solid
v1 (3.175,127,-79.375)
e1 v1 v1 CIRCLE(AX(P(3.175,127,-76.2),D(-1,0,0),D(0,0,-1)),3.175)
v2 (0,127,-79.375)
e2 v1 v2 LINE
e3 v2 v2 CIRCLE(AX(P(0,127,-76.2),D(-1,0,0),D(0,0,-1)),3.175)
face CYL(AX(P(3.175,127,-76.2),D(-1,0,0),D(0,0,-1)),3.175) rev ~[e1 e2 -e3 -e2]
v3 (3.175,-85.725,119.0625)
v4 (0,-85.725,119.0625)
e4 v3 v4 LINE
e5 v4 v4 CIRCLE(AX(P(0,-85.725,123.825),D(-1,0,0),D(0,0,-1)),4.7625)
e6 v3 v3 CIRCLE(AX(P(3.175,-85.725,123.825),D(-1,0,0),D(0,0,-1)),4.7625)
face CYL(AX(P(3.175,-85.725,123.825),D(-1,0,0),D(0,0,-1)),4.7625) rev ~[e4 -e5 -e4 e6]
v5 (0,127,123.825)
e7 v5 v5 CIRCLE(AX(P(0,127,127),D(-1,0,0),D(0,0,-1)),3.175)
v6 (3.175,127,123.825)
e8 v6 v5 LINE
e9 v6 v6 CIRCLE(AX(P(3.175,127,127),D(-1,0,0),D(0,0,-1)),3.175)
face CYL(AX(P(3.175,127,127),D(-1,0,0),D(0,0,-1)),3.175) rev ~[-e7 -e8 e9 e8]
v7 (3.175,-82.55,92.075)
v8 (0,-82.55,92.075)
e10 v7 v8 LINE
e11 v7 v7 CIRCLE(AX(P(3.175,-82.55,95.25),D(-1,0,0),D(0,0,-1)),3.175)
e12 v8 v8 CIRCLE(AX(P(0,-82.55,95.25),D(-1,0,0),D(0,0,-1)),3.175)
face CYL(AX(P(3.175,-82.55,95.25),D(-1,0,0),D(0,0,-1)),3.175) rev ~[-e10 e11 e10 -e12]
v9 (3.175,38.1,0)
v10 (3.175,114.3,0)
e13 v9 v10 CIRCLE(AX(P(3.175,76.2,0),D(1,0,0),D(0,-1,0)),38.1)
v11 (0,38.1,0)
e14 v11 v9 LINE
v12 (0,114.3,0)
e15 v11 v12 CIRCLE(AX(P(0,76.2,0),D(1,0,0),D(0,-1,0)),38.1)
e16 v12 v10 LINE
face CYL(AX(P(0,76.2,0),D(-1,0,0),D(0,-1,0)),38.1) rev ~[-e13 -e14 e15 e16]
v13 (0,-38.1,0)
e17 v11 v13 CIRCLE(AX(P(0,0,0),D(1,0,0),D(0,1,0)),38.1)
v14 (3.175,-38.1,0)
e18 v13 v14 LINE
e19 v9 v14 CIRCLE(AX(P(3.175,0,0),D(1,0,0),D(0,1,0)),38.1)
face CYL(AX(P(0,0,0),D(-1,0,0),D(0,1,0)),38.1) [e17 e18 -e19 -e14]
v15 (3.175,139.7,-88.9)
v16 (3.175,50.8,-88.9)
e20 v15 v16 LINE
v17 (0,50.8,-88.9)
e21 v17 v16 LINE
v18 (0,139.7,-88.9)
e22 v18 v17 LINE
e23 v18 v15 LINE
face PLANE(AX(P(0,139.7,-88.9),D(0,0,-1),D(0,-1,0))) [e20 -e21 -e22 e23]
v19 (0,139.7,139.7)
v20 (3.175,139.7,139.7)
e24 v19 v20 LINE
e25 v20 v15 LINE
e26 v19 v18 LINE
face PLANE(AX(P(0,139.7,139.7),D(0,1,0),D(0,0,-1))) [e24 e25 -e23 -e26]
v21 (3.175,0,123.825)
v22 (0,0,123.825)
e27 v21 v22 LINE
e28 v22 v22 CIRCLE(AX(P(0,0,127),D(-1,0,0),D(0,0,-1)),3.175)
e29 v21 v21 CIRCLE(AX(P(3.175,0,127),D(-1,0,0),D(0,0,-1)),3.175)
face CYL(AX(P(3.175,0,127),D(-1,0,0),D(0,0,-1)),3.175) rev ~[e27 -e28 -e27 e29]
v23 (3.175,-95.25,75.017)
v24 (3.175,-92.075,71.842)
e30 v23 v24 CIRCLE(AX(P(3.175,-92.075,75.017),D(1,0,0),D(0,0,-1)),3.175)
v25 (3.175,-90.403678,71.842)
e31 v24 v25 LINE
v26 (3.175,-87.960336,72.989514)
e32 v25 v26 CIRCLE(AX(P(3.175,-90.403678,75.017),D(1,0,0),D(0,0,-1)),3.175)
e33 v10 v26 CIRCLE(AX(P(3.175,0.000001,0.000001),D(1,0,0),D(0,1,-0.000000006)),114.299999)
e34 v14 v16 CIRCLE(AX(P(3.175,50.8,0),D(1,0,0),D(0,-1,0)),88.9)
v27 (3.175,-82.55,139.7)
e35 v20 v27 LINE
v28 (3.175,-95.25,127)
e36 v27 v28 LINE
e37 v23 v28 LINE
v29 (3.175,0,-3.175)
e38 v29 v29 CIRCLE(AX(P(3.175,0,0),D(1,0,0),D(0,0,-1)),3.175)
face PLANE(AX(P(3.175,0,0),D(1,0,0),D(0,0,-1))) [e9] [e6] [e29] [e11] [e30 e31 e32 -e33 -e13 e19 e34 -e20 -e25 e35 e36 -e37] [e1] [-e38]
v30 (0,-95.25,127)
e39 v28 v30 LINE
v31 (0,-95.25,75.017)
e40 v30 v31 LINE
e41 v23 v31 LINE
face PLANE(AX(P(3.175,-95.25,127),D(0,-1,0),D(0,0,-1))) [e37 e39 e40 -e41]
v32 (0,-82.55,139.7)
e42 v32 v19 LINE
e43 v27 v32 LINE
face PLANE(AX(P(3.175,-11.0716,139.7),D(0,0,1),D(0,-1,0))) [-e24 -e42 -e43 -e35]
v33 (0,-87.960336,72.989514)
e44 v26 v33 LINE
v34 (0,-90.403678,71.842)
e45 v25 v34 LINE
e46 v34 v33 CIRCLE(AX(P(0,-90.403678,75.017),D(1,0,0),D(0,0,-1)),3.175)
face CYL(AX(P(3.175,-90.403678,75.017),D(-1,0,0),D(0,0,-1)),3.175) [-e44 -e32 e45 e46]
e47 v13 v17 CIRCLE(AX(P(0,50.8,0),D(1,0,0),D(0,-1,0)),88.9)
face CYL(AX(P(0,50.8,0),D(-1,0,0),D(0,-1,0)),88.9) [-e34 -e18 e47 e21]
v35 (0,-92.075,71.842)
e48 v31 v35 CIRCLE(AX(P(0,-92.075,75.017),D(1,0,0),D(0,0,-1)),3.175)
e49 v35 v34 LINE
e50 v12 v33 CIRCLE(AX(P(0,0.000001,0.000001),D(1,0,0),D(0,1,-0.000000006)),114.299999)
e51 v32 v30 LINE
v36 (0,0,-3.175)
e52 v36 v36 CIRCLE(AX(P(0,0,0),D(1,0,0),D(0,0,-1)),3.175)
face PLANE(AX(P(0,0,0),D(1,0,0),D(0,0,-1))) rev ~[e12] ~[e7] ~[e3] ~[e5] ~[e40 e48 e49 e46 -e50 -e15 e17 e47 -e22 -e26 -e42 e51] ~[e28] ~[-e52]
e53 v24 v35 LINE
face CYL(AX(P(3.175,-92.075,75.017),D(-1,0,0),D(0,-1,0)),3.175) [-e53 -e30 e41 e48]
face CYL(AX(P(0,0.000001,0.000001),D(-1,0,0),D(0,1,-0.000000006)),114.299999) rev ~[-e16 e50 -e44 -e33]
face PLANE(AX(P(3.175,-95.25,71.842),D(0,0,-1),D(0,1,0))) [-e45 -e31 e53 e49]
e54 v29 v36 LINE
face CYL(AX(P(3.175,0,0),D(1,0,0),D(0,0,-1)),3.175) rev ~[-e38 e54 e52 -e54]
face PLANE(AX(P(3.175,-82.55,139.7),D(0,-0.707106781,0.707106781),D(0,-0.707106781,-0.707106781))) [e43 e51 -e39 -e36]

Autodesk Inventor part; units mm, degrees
ref_plane "YZ Plane" through (0, 0, 0) normal (1, 0, 0) x (0, 1, 0)
ref_plane "XZ Plane" through (0, 0, 0) normal (0, 1, 0) x (-1, 0, 0)
ref_plane "XY Plane" through (0, 0, 0) normal (0, 0, 1) x (1, 0, 0)
sketch "Sketch1" plane through (0, 0, 0) normal (1, 0, 0) x (0, 1, 0)
  circle A0 centre (0, 0) radius 50.8 construction
  circle A1 centre (82.55, 0) radius 31.75 construction
  circle A2 centre (-82.55, 0) radius 31.75 construction
  circle A3 centre (0, 0) radius 114.3 construction
  circle A4 centre (0, 0) radius 38.1 construction
  arc A5 (38.1, 0) -> (114.3, 0) centre (76.2, 0) ccw construction
  arc A6 (-38.1, 0) -> (139.7, 0) centre (50.8, 0) ccw construction
  line L0 (50.8, -88.9) -> (139.7, -88.9) construction
  line L1 (139.7, -88.9) -> (139.7, 0) construction
  line L2 (139.7, 0) -> (-101.6, 0) construction
  line L3 (-101.6, 0) -> (-101.6, 139.7) construction
  line L4 (-101.6, 139.7) -> (139.7, 139.7) construction
  line L5 (139.7, 139.7) -> (139.7, 0) construction
  arc A7 (11.0716, 139.7) -> (-101.6, 96.52) centre (0, 0) ccw construction
  line L6 (-101.6, 139.7) -> (-101.6, 63.1817) construction
  line L7 (-101.6, 63.1817) -> (-95.25, 63.1817) construction
  arc A8 (-11.0716, 139.7) -> (-101.6, 96.52) centre (0, 0) ccw
  line L8 (-11.0716, 139.7) -> (139.7, 139.7)
  line L9 (139.7, 139.7) -> (139.7, -88.9)
  line L10 (139.7, -88.9) -> (50.8, -88.9)
  arc A9 (-38.1, 0) -> (50.8, -88.9) centre (50.8, 0) ccw
  arc A10 (38.1, 0) -> (-38.1, 0) centre (0, 0) ccw
  arc A11 (38.1, 0) -> (114.3, 0) centre (76.2, 0) ccw
  arc A12 (114.3, 0) -> (-95.25, 63.1817) centre (0, 0) ccw
  line L11 (-95.25, 63.1817) -> (-101.6, 63.1817)
  line L12 (-101.6, 96.52) -> (-101.6, 63.1817)
  dimension "d1" = 63.5
  dimension "d0" = 101.6
  dimension "d2" = 63.5
  dimension "d3" = 82.55
  dimension "d4" = 82.55
  dimension "d5" = 0
  dimension "d6" = 0
  dimension "d7" = 228.6
  dimension "d8" = 76.2
  dimension "d9" = 76.2
  dimension "d10" = 177.8
  dimension "d11" = 88.9
  dimension "d12" = 139.7
  dimension "d13" = 0
  dimension "d14" = 241.3
  dimension "d15" = 139.7
  dimension "d16" = 0
  dimension "d76" = 6.35
  dimension "d77" = 43.18
extrude "Extrusion1" add sketch "Sketch1" along normal blind 3.175
sketch "Sketch2" plane through (3.175, 0, 0) normal (1, 0, 0) x (0, 0, -1)
  arc A0 (0, 38.1) -> (0, -38.1) centre (0, 0) ccw projected
  arc A1 (0, -38.1) -> (88.9, 50.8) centre (0, 50.8) ccw projected
  line L0 (88.9, 50.8) -> (88.9, 139.7) projected
  line L1 (88.9, 139.7) -> (-139.7, 139.7) projected
  line L2 (-139.7, 139.7) -> (-139.7, -11.0716) projected
  arc A2 (-139.7, -11.0716) -> (-96.52, -101.6) centre (0, 0) ccw projected
  line L3 (-96.52, -101.6) -> (-63.1817, -101.6) projected
  line L4 (-63.1817, -101.6) -> (-63.1817, -95.25) projected
  arc A3 (0, 114.3) -> (-63.1817, -95.25) centre (0, 0) ccw projected
  arc A4 (0, 38.1) -> (0, 114.3) centre (0, 76.2) ccw projected
  line L5 (-63.1817, -101.6) -> (-139.3817, -101.6)
  line L6 (-139.3817, -101.6) -> (-139.3817, -95.25)
  line L7 (-139.3817, -95.25) -> (-63.1817, -95.25)
  line L8 (-63.1817, -95.25) -> (-63.1817, -101.6)
  arc A5 (0, 114.3) -> (-63.1817, -95.25) centre (0, 0) ccw projected
  line L9 (-63.1817, -101.6) -> (-71.842, -101.6)
  line L10 (-71.842, -101.6) -> (-71.842, -88.9)
  line L11 (-71.842, -88.9) -> (-63.1817, -88.9)
  line L12 (-63.1817, -88.9) -> (-63.1817, -101.6)
  point P0 (0, 0)
  dimension "d24" = 76.2
  dimension "d25" = 6.35
  dimension "d26" = 12.7
extrude "Extrusion2" cut sketch "Sketch2" against normal blind 3.175 contours L11 L12 A3 | A3 L7 L10 | L4 L3 L10 L7 | L10 L3 A2 L7 | A2 L5 L6 L7
sketch "Sketch3" plane through (3.175, 0, 0) normal (1, 0, 0) x (0, 0, -1)
  line L0 (-102.7916, -95.25) -> (-71.842, -95.25) projected
  line L1 (-71.842, -95.25) -> (-71.842, -88.9) projected
  arc A0 (0, 114.3) -> (-71.842, -88.9) centre (0, 0) ccw projected
  arc A1 (0, 38.1) -> (0, 114.3) centre (0, 76.2) ccw projected
  arc A2 (0, 38.1) -> (0, -38.1) centre (0, 0) ccw projected
  arc A3 (0, -38.1) -> (88.9, 50.8) centre (0, 50.8) ccw projected
  line L2 (88.9, 50.8) -> (88.9, 139.7) projected
  line L3 (88.9, 139.7) -> (-139.7, 139.7) projected
  line L4 (-139.7, 139.7) -> (-139.7, -11.0716) projected
  arc A4 (-139.7, -11.0716) -> (-102.7916, -95.25) centre (0, 0) ccw projected
  point P0 (0, 0)
  point P1 (-127, 127)
  point P2 (76.2, 127)
  point P3 (-95.25, -82.55)
  point P4 (-127, 0)
  dimension "d29" = 12.7
  dimension "d30" = 12.7
  dimension "d31" = 12.7
  dimension "d32" = 12.7
  dimension "d33" = 12.7
  dimension "d34" = 139.7
  dimension "d35" = 95.25
  dimension "d36" = 82.55
hole "Hole1" at (3.175, 127, 127) at (3.175, 127, -76.2) at (3.175, -82.55, 95.25) at (3.175, 0, 127) direction (-1, 0, 0) diameter 6.35 end through all
sketch "Sketch4" plane through (3.175, 0, 0) normal (1, 0, 0) x (0, 0, -1)
  circle A0 centre (-95.25, -82.55) radius 3.175 projected
  circle A1 centre (-127, 127) radius 3.175 projected
  circle A2 centre (76.2, 127) radius 3.175 projected
  circle A3 centre (-127, 0) radius 3.175 projected
  line L0 (-102.7916, -95.25) -> (-71.842, -95.25) projected
  line L1 (-71.842, -95.25) -> (-71.842, -88.9) projected
  arc A4 (0, 114.3) -> (-71.842, -88.9) centre (0, 0) ccw projected
  arc A5 (0, 38.1) -> (0, 114.3) centre (0, 76.2) ccw projected
  arc A6 (0, 38.1) -> (0, -38.1) centre (0, 0) ccw projected
  arc A7 (0, -38.1) -> (88.9, 50.8) centre (0, 50.8) ccw projected
  line L2 (88.9, 50.8) -> (88.9, 139.7) projected
  line L3 (88.9, 139.7) -> (-139.7, 139.7) projected
  line L4 (-139.7, 139.7) -> (-139.7, -11.0716) projected
  arc A8 (-139.7, -11.0716) -> (-102.7916, -95.25) centre (0, 0) ccw projected
  circle A9 centre (0, 0) radius 3.175
  point P0 (0, 0)
  dimension "d55" = 6.35
sketch "Sketch5" plane through (3.175, 0, 0) normal (1, 0, 0) x (0, 0, -1)
  circle A0 centre (-95.25, -82.55) radius 3.175 projected
  circle A1 centre (-127, 127) radius 3.175 projected
  circle A2 centre (76.2, 127) radius 3.175 projected
  circle A3 centre (-127, 0) radius 3.175 projected
  line L0 (-102.7916, -95.25) -> (-71.842, -95.25) projected
  line L1 (-71.842, -95.25) -> (-71.842, -88.9) projected
  arc A4 (0, 114.3) -> (-71.842, -88.9) centre (0, 0) ccw projected
  arc A5 (0, 38.1) -> (0, 114.3) centre (0, 76.2) ccw projected
  arc A6 (0, 38.1) -> (0, -38.1) centre (0, 0) ccw projected
  arc A7 (0, -38.1) -> (88.9, 50.8) centre (0, 50.8) ccw projected
  line L2 (88.9, 50.8) -> (88.9, 139.7) projected
  line L3 (88.9, 139.7) -> (-139.7, 139.7) projected
  line L4 (-139.7, 139.7) -> (-139.7, -11.0716) projected
  arc A8 (-139.7, -11.0716) -> (-102.7916, -95.25) centre (0, 0) ccw projected
  line L5 (-139.7, -11.0716) -> (-139.7, -95.25) construction
  line L6 (-139.7, -95.25) -> (-102.7916, -95.25) construction
  line L7 (-139.7, -95.25) -> (-127, -95.25) construction
  line L8 (-127, -95.25) -> (-127, -82.55) construction
  line L9 (-127, -82.55) -> (-139.7, -82.55) construction
  line L10 (-139.7, -82.55) -> (-139.7, -95.25) construction
  line L11 (-139.7, -11.0716) -> (-139.7, -82.55)
  line L12 (-139.7, -82.55) -> (-127, -95.25)
  line L13 (-127, -95.25) -> (-102.7916, -95.25)
  point P0 (0, 0)
  dimension "d60" = 12.7
  dimension "d61" = 12.7
extrude "Extrusion4" add sketch "Sketch5" against normal blind 3.175 contours L13 L12 L11 A8
sketch "Sketch6" plane through (3.175, 0, 0) normal (1, 0, 0) x (0, 0, -1)
  circle A0 centre (-95.25, -82.55) radius 3.175 projected
  circle A1 centre (-127, 127) radius 3.175 projected
  circle A2 centre (76.2, 127) radius 3.175 projected
  circle A3 centre (-127, 0) radius 3.175 projected
  line L0 (-127, -95.25) -> (-71.842, -95.25) projected
  line L1 (-71.842, -95.25) -> (-71.842, -88.9) projected
  arc A4 (0, 114.3) -> (-71.842, -88.9) centre (0, 0) ccw projected
  arc A5 (0, 38.1) -> (0, 114.3) centre (0, 76.2) ccw projected
  arc A6 (0, 38.1) -> (0, -38.1) centre (0, 0) ccw projected
  arc A7 (0, -38.1) -> (88.9, 50.8) centre (0, 50.8) ccw projected
  line L2 (88.9, 50.8) -> (88.9, 139.7) projected
  line L3 (88.9, 139.7) -> (-139.7, 139.7) projected
  line L4 (-139.7, 139.7) -> (-139.7, -82.55) projected
  line L5 (-139.7, -82.55) -> (-127, -95.25) projected
  point P0 (0, 0)
  point P1 (-123.825, -85.725)
  dimension "d64" = 15.875
  dimension "d65" = 9.525
hole "Hole3" at (3.175, -85.725, 123.825) direction (-1, 0, 0) diameter 9.525 end through all
fillet "Fillet1" radius 3.175 2 edges at (1.5875, -95.25, 71.842) (1.5875, -88.9, 71.842)
extrude "Extrusion5" cut sketch "Sketch4" against normal blind 25.4 contours A9
properties part number "rail" material "Aluminum 6061"
